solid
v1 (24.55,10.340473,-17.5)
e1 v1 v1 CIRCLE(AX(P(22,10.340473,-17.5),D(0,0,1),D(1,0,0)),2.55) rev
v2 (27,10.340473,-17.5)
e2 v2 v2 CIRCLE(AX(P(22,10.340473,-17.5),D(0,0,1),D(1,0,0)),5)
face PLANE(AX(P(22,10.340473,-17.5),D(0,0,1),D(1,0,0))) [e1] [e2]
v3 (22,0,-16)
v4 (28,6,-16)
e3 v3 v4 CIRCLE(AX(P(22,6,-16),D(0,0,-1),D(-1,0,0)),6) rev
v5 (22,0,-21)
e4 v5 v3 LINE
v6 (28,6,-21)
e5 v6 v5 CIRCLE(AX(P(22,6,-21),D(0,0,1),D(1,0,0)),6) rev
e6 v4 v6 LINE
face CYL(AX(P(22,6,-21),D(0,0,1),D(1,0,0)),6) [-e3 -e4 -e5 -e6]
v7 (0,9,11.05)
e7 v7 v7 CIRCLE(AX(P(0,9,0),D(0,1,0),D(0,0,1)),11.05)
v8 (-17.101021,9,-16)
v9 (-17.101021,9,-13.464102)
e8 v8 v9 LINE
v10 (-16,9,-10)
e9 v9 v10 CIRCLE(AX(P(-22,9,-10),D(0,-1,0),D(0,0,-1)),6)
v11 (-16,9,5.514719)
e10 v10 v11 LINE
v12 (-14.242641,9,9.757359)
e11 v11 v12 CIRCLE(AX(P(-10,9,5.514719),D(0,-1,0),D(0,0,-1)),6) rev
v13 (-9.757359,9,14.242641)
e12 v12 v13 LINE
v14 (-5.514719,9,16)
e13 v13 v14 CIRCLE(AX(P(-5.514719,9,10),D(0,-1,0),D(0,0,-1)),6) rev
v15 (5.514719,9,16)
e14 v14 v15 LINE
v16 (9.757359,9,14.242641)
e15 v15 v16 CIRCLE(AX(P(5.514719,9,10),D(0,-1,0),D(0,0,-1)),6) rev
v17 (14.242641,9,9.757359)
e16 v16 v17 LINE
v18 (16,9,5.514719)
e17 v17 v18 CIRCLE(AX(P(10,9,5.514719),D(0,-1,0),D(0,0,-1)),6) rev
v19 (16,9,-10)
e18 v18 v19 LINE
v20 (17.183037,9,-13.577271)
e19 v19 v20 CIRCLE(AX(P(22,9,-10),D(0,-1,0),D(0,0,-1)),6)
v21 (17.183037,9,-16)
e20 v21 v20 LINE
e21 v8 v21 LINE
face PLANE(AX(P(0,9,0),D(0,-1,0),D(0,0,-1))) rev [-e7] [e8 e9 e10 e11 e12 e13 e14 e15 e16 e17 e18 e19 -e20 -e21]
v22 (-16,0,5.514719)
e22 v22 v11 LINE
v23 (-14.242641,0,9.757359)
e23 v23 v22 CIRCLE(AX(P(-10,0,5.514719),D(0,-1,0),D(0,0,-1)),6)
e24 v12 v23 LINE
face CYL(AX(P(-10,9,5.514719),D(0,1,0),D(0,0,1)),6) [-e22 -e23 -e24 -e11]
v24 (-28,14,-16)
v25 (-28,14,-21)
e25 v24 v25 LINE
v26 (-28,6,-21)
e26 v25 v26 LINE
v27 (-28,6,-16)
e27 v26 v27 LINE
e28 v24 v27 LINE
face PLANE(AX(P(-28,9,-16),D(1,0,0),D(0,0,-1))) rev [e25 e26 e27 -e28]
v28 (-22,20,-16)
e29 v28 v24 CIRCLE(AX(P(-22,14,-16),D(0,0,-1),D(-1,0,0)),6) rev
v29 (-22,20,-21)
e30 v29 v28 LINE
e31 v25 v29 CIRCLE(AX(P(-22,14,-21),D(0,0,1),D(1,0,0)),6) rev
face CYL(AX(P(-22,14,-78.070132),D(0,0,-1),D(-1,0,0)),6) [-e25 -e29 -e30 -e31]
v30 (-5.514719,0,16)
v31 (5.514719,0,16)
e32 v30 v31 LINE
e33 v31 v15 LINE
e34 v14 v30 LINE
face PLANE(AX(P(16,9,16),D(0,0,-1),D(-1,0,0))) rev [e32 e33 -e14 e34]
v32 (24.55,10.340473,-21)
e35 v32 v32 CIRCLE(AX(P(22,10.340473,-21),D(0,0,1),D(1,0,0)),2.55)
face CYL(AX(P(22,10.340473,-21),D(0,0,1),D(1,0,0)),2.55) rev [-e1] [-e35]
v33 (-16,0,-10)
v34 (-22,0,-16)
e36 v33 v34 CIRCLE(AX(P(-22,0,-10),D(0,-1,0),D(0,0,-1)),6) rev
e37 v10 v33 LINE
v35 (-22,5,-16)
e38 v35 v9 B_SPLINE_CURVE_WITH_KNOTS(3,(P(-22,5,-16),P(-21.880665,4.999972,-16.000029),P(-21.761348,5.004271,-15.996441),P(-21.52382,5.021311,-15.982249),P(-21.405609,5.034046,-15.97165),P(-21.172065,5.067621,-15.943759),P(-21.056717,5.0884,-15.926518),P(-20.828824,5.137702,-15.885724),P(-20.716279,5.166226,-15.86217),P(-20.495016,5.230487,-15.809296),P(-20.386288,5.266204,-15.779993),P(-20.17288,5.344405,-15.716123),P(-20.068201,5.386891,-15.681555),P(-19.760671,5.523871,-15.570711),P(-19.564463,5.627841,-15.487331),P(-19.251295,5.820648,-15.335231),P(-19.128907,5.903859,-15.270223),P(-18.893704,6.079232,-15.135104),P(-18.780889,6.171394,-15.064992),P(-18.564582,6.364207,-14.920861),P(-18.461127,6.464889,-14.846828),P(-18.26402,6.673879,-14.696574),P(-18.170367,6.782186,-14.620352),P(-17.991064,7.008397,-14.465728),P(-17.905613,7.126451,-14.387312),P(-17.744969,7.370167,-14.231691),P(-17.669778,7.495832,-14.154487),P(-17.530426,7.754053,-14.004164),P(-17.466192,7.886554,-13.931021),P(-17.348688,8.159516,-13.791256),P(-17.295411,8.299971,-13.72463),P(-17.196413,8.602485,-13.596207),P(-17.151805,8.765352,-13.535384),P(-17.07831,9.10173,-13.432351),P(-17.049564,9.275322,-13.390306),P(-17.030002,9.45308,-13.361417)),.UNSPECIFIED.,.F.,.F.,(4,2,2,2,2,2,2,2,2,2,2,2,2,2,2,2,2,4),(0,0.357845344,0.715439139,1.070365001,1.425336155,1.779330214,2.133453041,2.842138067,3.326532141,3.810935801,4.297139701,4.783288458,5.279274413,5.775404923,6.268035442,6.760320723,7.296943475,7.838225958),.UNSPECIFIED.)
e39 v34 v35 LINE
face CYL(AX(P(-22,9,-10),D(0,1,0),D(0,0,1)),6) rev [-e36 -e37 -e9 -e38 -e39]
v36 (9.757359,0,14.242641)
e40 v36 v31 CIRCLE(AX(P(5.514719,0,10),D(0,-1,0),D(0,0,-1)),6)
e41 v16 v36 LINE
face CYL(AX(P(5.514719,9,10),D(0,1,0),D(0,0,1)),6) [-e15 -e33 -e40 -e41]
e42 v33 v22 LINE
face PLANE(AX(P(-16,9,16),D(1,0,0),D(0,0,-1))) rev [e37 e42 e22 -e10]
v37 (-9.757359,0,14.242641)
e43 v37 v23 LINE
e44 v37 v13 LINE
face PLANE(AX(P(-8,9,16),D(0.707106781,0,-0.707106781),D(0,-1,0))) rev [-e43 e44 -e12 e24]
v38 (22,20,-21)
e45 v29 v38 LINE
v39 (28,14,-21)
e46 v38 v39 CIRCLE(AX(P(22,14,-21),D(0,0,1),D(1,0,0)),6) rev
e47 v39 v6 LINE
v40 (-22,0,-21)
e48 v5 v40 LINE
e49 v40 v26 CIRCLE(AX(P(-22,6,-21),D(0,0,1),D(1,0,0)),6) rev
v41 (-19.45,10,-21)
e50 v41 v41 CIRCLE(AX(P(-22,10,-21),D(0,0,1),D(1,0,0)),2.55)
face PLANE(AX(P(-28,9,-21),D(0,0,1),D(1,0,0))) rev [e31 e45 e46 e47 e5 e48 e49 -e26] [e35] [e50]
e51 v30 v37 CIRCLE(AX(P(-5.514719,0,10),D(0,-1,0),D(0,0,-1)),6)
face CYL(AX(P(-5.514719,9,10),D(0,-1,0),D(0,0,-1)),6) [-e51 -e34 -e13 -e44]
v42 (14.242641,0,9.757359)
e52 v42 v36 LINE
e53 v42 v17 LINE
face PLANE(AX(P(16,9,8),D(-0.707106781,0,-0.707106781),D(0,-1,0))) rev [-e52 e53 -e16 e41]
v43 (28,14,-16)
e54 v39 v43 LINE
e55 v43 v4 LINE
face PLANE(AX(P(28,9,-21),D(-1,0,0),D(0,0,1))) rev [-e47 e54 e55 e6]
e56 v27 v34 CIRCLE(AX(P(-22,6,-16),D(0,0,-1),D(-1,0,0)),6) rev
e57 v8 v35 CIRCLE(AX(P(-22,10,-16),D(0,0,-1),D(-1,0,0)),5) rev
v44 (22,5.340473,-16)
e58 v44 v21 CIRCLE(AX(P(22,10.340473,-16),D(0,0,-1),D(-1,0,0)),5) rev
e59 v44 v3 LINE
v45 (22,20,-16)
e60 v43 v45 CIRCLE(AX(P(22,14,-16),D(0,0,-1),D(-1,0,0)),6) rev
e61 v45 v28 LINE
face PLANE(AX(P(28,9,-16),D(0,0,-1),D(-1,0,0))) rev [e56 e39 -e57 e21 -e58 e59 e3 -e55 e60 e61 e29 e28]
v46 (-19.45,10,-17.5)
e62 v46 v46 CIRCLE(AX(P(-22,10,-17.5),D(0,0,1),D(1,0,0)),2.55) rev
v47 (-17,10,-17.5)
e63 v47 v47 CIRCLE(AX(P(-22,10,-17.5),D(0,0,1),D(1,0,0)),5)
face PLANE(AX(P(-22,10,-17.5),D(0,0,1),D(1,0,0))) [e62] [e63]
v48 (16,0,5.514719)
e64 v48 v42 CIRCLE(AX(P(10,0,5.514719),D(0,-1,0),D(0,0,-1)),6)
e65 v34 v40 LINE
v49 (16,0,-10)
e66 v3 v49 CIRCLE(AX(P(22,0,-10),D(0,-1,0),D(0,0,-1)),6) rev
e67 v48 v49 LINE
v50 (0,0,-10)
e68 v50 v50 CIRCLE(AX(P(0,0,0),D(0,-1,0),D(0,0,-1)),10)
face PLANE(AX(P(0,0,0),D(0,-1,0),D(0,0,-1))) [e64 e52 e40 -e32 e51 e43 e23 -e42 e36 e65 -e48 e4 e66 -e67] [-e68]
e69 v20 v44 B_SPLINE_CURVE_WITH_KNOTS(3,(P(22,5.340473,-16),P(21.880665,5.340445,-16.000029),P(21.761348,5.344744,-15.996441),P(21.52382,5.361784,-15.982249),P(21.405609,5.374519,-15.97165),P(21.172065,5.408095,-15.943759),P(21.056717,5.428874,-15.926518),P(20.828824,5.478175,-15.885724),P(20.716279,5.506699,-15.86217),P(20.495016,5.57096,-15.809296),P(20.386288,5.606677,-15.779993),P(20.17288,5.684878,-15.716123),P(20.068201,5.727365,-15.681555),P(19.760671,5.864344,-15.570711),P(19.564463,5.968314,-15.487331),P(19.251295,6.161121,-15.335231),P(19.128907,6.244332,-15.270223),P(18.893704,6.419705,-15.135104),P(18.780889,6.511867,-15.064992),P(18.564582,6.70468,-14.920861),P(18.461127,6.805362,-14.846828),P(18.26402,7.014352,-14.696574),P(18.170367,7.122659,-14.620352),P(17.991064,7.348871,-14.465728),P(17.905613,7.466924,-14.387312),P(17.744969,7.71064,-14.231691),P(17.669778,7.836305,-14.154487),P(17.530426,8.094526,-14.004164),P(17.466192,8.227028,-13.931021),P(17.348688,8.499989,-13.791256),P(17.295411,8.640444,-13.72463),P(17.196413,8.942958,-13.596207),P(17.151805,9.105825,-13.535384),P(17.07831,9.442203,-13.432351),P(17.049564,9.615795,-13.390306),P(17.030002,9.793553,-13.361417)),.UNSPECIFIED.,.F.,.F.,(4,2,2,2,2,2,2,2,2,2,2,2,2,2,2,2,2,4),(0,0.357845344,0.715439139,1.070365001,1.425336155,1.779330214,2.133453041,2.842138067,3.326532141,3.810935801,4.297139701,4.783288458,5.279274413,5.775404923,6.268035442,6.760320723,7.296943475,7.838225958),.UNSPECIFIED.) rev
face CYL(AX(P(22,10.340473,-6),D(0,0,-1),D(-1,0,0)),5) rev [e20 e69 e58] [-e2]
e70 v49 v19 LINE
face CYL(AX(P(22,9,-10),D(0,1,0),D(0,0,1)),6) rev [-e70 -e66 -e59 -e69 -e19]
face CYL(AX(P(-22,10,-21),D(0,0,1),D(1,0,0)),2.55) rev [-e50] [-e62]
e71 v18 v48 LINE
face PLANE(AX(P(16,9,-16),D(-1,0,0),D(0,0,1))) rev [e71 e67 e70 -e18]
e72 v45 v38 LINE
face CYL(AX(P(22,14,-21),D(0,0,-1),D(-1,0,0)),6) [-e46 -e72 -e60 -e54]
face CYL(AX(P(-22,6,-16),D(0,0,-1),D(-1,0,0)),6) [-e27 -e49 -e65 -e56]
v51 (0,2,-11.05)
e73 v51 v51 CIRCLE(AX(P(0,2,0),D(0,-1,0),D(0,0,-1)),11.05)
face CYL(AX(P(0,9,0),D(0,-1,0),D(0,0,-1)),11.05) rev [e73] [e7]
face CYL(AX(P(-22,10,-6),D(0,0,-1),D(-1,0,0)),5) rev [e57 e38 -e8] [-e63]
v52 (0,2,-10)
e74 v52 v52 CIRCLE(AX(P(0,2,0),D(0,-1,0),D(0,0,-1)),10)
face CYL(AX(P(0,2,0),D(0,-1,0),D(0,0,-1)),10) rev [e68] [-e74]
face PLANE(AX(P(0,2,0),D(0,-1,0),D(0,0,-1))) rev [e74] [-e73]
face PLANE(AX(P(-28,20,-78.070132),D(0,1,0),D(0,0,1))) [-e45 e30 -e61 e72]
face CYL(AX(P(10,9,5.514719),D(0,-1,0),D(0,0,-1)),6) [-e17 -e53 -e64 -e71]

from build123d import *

# Parameters (mm, degrees)
SKETCH2_R               = 11.05
BOSS_EXTRUDE1_DEPTH     = 9
CHAMFER1_SIZE           = 8
SKETCH3_R               = 13
SKETCH3_R_2             = 10
BOSS_EXTRUDE2_DEPTH     = 2
SKETCH5_W               = 56
SKETCH5_H               = 11
BOSS_EXTRUDE3_DEPTH     = 5
SKETCH6_R               = 2.55
CUT_EXTRUDE5_DEPTH      = 47.989360498
CUT_EXTRUDE6_DEPTH      = 10
CUT_EXTRUDE6_DEPTH_BACK = 1.5
SKETCH7_R               = 5
FILLET1_R               = 6


with BuildPart() as part:
    # Sketch2 → Boss-Extrude1 (new body)
    with BuildSketch(Plane(origin=(0, 0, 0), x_dir=(1, 0, 0), z_dir=(0, 1, 0))):
        Polygon((-28, 21), (28, 21), (28, 16), (16, 16), (16, -16), (-16, -16), (-16, 16), (-28, 16), align=None)
        with Locations(Location((0, 0, 0), (0, 0, 270))):
            Circle(SKETCH2_R, mode=Mode.SUBTRACT)
    extrude(amount=BOSS_EXTRUDE1_DEPTH)

    # Chamfer1
    chamfer1_edges = [part.edges().sort_by_distance(p)[0] for p in [
        (16, 4.5, 16),
        (-16, 4.5, 16),
    ]]
    chamfer(chamfer1_edges, length=CHAMFER1_SIZE)

    # Sketch3 → Boss-Extrude2 (add)
    with BuildSketch(Plane.XZ):
        Circle(SKETCH3_R)
        with Locations(Location((0, 0, 0), (0, 0, 270))):
            Circle(SKETCH3_R_2, mode=Mode.SUBTRACT)
    extrude(amount=-BOSS_EXTRUDE2_DEPTH)

    # Sketch5 → Boss-Extrude3 (add)
    with BuildSketch(Plane.XY.offset(-16)):
        with Locations((0, 14.5)):
            Rectangle(SKETCH5_W, SKETCH5_H)
    extrude(amount=-BOSS_EXTRUDE3_DEPTH)

    # Sketch6 → Cut-Extrude5 (cut, through all)
    with BuildSketch(Plane.XY.offset(-16)):
        with Locations((-22, 10)):
            Circle(SKETCH6_R)
        with Locations((22, 10.340473159)):
            Circle(SKETCH6_R)
    extrude(amount=-CUT_EXTRUDE5_DEPTH, mode=Mode.SUBTRACT)

    # Sketch7 → Cut-Extrude6 (cut, two sides: drawn at the far end of the back side and taken through both)
    with BuildSketch(Plane.XY.offset(-16).offset(-CUT_EXTRUDE6_DEPTH_BACK)):
        with Locations(Location((22, 10.340473159, 0), (0, 0, 180))):
            Circle(SKETCH7_R)
        with Locations(Location((-22, 10, 0), (0, 0, 180))):
            Circle(SKETCH7_R)
    extrude(amount=CUT_EXTRUDE6_DEPTH + CUT_EXTRUDE6_DEPTH_BACK, mode=Mode.SUBTRACT)

    # Fillet1
    # the kernel refuses this fillet: 6 mm, written as the material it adds along each edge
    with BuildSketch(Plane(origin=(-16, 0, -16), x_dir=(-1, 0, 0), z_dir=(0, 1, 0))) as fillet1_piece_1_section:
        with BuildLine():
            CenterArc((FILLET1_R, FILLET1_R), FILLET1_R, 180, 90)
            Line((0, FILLET1_R), (0, 0))
            Line((0, 0), (FILLET1_R, 0))
        make_face()
    fillet1_piece_1 = extrude(amount=9, mode=Mode.PRIVATE)
    fillet1_piece_1 = fillet1_piece_1 - Plane(origin=(-22, 10, -14.524998949), x_dir=(-1, 0, 0), z_dir=(0, 0, 1)) * Cylinder(5, 43, mode=Mode.PRIVATE)
    add(fillet1_piece_1)
    with BuildSketch(Plane(origin=(16, 0, -16), x_dir=(0, 0, 1), z_dir=(0, 1, 0))) as fillet1_piece_2_section:
        with BuildLine():
            CenterArc((FILLET1_R, FILLET1_R), FILLET1_R, 180, 90)
            Line((0, FILLET1_R), (0, 0))
            Line((0, 0), (FILLET1_R, 0))
        make_face()
    fillet1_piece_2 = extrude(amount=9, mode=Mode.PRIVATE)
    fillet1_piece_2 = fillet1_piece_2 - Plane(origin=(22, 10.340473159, -14.541701279), x_dir=(-1, 0, 0), z_dir=(0, 0, 1)) * Cylinder(5, 42, mode=Mode.PRIVATE)
    add(fillet1_piece_2)
    # the kernel refuses this fillet: 6 mm, written as the material it takes off along each edge
    with BuildSketch(Plane(origin=(16, -6.213203436, 8), x_dir=(0, 0, -1), z_dir=(0, 1, 0))) as fillet1_2_piece_1:
        with BuildLine():
            CenterArc((FILLET1_R * 0.414213562373, FILLET1_R), FILLET1_R, 225, 45)
            Line((-FILLET1_R * 0.292893218813, FILLET1_R * 0.292893218813), (0, 0))
            Line((0, 0), (FILLET1_R * 0.414213562373, 0))
        make_face()
    extrude(amount=21.426406871, mode=Mode.SUBTRACT)
    with BuildSketch(Plane(origin=(8, -6.213203436, 16), x_dir=(-1, 0, 0), z_dir=(0, 1, 0)), Plane(origin=(-8, -6.213203436, 16), x_dir=(-0.7071067811865481, 0, -0.707106781186547), z_dir=(0, 1, 0)), Plane(origin=(-16, -6.213203436, 8), x_dir=(0, 0, -1), z_dir=(0, 1, 0))) as fillet1_2_piece_2:
        with BuildLine():
            CenterArc((FILLET1_R * 0.414213562373, -FILLET1_R), FILLET1_R, 90, 45)
            Line((-FILLET1_R * 0.292893218813, -FILLET1_R * 0.292893218813), (0, 0))
            Line((0, 0), (FILLET1_R * 0.414213562373, 0))
        make_face()
    extrude(amount=21.426406871, mode=Mode.SUBTRACT)
    with BuildSketch(Plane(origin=(28, 0, -36), x_dir=(0, 1, 0), z_dir=(0, 0, 1)), Plane(origin=(28, 20, -1), x_dir=(0, -1, 0), z_dir=(0, 0, -1)), Plane(origin=(-28, 20, -1), x_dir=(1, 0, 0), z_dir=(0, 0, -1)), Plane(origin=(-28, 0, -1), x_dir=(0, 1, 0), z_dir=(0, 0, -1))) as fillet1_2_piece_3:
        with BuildLine():
            CenterArc((FILLET1_R, FILLET1_R), FILLET1_R, 180, 90)
            Line((0, FILLET1_R), (0, 0))
            Line((0, 0), (FILLET1_R, 0))
        make_face()
    extrude(amount=35, mode=Mode.SUBTRACT)


solid = part.part
